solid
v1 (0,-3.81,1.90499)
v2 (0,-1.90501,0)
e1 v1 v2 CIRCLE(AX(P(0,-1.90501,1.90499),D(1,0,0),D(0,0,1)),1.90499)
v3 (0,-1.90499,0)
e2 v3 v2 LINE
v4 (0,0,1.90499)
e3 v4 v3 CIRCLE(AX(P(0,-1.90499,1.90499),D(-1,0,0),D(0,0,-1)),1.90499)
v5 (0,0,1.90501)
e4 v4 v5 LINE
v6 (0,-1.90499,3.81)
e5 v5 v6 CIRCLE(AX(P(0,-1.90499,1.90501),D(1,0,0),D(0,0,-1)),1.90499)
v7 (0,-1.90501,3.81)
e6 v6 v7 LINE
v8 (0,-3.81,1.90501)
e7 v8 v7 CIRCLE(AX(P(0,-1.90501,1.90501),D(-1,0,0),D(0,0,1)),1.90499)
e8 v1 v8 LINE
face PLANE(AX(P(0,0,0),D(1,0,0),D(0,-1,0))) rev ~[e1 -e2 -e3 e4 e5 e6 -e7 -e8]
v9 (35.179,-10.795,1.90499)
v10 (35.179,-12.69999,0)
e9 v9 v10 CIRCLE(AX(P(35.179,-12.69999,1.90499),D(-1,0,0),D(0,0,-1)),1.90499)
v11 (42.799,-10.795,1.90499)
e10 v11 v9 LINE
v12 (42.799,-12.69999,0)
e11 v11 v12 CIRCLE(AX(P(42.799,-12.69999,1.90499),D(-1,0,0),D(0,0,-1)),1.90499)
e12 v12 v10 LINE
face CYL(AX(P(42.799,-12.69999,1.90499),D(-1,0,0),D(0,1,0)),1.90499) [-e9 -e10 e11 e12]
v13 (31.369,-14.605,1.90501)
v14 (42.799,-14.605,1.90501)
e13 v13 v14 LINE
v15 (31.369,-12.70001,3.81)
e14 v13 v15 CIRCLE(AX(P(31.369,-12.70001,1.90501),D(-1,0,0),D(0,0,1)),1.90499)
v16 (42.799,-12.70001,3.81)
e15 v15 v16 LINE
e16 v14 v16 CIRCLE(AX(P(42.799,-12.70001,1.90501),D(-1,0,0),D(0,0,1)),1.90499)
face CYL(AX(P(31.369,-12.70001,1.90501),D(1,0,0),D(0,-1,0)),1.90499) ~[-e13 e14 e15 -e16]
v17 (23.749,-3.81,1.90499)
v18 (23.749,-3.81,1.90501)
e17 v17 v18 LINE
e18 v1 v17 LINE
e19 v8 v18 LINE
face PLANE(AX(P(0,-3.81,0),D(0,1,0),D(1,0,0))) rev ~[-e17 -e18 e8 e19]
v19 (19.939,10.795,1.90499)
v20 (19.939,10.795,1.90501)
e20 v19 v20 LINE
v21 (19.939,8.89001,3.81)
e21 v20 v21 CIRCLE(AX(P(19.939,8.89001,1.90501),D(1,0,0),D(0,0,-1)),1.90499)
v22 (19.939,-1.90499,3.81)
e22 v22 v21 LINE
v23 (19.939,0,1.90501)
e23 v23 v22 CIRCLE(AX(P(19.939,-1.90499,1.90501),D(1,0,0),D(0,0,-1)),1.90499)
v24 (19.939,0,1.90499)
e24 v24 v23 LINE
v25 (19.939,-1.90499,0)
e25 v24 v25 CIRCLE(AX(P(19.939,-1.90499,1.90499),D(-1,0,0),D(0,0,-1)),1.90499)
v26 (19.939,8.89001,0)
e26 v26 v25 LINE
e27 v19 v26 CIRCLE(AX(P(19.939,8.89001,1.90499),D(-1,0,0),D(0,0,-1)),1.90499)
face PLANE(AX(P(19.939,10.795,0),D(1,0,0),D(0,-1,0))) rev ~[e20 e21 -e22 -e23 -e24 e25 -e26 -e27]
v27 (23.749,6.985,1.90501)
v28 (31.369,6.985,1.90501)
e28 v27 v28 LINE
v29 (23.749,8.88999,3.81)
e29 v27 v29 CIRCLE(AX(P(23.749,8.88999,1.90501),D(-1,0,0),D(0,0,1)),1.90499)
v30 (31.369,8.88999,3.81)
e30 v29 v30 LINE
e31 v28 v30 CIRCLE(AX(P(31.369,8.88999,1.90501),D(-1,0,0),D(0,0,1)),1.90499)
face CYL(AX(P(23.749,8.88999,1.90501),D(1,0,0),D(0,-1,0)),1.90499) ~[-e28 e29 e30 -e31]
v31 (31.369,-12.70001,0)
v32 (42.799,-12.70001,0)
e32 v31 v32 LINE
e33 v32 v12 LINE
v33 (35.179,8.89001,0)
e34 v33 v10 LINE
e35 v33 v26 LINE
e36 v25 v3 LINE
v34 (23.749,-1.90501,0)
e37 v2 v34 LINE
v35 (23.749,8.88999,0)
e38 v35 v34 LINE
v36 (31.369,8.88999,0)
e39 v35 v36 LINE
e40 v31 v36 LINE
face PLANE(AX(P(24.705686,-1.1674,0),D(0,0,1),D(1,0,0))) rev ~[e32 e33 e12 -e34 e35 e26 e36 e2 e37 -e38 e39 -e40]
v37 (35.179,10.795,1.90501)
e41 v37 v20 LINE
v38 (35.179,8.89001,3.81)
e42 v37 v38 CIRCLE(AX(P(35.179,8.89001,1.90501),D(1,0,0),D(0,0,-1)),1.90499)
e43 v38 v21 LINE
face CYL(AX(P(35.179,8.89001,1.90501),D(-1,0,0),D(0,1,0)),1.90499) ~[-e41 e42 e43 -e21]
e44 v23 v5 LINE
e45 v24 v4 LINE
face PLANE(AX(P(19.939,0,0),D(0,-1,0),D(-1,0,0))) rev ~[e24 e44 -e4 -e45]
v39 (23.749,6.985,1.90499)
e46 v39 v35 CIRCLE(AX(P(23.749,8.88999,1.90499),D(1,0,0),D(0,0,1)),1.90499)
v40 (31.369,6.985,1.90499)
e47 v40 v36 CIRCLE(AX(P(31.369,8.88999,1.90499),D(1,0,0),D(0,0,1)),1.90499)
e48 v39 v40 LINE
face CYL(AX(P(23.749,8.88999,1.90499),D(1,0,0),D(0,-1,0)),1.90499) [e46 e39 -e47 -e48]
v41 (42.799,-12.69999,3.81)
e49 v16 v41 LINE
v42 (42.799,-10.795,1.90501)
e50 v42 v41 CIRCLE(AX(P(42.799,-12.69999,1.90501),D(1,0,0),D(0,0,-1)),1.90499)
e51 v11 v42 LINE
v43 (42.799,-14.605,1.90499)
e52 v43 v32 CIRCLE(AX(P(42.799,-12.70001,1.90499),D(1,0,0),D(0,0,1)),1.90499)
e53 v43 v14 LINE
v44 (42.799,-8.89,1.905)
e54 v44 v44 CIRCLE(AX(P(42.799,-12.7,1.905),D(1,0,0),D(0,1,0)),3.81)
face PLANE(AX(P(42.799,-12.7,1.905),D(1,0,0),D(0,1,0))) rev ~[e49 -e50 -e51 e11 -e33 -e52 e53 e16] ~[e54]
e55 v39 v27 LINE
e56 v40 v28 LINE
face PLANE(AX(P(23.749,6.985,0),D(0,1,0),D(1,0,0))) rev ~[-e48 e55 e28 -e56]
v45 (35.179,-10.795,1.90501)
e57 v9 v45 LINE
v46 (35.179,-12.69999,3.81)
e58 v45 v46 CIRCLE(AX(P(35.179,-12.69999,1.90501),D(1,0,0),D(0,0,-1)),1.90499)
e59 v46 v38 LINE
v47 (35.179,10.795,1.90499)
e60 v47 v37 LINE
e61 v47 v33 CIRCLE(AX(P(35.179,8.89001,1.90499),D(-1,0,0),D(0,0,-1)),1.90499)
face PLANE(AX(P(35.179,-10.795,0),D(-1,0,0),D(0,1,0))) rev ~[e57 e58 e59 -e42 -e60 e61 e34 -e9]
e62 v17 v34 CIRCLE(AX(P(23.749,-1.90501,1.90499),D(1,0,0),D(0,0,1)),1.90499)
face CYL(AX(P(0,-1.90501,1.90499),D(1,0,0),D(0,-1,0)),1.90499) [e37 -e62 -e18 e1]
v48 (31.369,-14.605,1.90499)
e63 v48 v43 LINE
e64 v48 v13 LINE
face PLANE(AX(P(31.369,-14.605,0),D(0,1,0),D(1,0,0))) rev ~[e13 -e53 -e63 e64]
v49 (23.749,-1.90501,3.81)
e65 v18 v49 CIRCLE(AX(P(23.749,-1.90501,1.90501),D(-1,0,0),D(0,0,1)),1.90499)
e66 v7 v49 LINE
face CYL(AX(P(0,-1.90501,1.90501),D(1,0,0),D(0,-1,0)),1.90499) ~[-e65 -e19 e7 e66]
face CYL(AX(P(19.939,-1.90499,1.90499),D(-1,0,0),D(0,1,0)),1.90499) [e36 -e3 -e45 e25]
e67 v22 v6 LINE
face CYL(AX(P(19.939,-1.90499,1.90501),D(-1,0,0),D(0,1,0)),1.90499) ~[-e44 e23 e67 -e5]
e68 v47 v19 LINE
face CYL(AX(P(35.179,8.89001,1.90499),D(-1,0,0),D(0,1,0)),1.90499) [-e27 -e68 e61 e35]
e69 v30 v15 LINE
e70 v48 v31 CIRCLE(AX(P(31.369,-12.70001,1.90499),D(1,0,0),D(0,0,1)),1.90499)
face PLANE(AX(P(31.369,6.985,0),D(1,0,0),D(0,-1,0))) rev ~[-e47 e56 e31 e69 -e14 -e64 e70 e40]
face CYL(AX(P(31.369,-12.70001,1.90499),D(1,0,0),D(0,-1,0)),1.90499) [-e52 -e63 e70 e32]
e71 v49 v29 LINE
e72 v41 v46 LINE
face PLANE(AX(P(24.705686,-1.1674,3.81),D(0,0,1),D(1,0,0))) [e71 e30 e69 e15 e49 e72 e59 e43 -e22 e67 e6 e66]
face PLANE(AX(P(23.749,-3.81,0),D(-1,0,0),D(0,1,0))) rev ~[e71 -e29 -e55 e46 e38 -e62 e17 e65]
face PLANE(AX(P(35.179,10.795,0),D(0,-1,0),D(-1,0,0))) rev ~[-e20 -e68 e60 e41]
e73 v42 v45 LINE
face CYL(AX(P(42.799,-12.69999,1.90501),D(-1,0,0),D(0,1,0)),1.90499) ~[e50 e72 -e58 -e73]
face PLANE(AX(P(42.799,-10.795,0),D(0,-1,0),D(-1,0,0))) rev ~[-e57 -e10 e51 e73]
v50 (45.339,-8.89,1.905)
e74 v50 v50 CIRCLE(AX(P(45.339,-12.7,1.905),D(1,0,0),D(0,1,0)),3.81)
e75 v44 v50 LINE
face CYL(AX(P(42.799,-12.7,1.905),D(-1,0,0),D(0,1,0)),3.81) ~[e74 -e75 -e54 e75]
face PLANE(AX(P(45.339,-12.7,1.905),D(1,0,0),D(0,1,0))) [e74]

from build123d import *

# Parameters (mm, degrees)
F1_DEPTH = 3.81
F2_R     = 1.90499
F3_R     = 3.81
F4_DEPTH = 2.54


# Not quite as in the source:
# - a fillet or chamfer is up to 0.001 mm smaller than in the source, because OpenCascade refuses the exact size
# - ends of sketch curves that miss each other by under 0.0002 mm in the source are joined


with BuildPart() as f1:
    # F0 (on Top) → F1 (new body)
    with BuildSketch(Plane.XY):
        Polygon((19.939, 0), (0, 0), (0, -3.81), (23.749, -3.81), (23.749, 6.985), (31.369, 6.985), (31.369, -14.605), (42.799, -14.605), (42.799, -10.795), (35.179, -10.795), (35.179, 10.795), (19.939, 10.795), align=None)
    extrude(amount=F1_DEPTH)

    # F2 (radius 1.905 in the source; OpenCascade refuses exactly that, so slightly less here)
    f2_edges = [f1.edges().sort_by_distance(p)[0] for p in [
        (9.9695, 0, 3.81),
        (9.9695, 0, 0),
        (11.8745, -3.81, 3.81),
        (11.8745, -3.81, 0),
        (27.559, 10.795, 3.81),
        (27.559, 6.985, 3.81),
        (27.559, 6.985, 0),
        (27.559, 10.795, 0),
        (38.989, -10.795, 3.81),
        (37.084, -14.605, 3.81),
        (38.989, -10.795, 0),
        (37.084, -14.605, 0),
    ]]
    fillet(f2_edges, radius=F2_R)

    # F3 (on face) → F4 (join)
    with BuildSketch(Plane.YZ.offset(42.799)):
        with Locations((-12.7, 1.905)):
            Circle(F3_R)
        with BuildLine():
            ThreePointArc((-12.70001, 0), (-14.0470413471, 0.5579586529), (-14.605, 1.90499))
            ThreePointArc((-14.605, 1.90499), (-14.0470413471, 3.2520413471), (-12.70001, 3.81))
            ThreePointArc((-12.70001, 3.81), (-11.3529586529, 3.2520413471), (-10.795, 1.90501))
            ThreePointArc((-10.795, 1.90501), (-11.3529586529, 0.5579586529), (-12.70001, 0))
        make_face(mode=Mode.SUBTRACT)
        with BuildLine():
            ThreePointArc((-12.70001, 3.81), (-14.0470413471, 3.2520413471), (-14.605, 1.90501))
            ThreePointArc((-14.605, 1.90501), (-14.0470413471, 0.5579586529), (-12.70001, 0))
            ThreePointArc((-12.70001, 0), (-11.3529586529, 0.5579586529), (-10.795, 1.90499))
            ThreePointArc((-10.795, 1.90499), (-11.3529586529, 3.2520413471), (-12.70001, 3.81))
        make_face()
    extrude(amount=F4_DEPTH)


solid = f1.part
